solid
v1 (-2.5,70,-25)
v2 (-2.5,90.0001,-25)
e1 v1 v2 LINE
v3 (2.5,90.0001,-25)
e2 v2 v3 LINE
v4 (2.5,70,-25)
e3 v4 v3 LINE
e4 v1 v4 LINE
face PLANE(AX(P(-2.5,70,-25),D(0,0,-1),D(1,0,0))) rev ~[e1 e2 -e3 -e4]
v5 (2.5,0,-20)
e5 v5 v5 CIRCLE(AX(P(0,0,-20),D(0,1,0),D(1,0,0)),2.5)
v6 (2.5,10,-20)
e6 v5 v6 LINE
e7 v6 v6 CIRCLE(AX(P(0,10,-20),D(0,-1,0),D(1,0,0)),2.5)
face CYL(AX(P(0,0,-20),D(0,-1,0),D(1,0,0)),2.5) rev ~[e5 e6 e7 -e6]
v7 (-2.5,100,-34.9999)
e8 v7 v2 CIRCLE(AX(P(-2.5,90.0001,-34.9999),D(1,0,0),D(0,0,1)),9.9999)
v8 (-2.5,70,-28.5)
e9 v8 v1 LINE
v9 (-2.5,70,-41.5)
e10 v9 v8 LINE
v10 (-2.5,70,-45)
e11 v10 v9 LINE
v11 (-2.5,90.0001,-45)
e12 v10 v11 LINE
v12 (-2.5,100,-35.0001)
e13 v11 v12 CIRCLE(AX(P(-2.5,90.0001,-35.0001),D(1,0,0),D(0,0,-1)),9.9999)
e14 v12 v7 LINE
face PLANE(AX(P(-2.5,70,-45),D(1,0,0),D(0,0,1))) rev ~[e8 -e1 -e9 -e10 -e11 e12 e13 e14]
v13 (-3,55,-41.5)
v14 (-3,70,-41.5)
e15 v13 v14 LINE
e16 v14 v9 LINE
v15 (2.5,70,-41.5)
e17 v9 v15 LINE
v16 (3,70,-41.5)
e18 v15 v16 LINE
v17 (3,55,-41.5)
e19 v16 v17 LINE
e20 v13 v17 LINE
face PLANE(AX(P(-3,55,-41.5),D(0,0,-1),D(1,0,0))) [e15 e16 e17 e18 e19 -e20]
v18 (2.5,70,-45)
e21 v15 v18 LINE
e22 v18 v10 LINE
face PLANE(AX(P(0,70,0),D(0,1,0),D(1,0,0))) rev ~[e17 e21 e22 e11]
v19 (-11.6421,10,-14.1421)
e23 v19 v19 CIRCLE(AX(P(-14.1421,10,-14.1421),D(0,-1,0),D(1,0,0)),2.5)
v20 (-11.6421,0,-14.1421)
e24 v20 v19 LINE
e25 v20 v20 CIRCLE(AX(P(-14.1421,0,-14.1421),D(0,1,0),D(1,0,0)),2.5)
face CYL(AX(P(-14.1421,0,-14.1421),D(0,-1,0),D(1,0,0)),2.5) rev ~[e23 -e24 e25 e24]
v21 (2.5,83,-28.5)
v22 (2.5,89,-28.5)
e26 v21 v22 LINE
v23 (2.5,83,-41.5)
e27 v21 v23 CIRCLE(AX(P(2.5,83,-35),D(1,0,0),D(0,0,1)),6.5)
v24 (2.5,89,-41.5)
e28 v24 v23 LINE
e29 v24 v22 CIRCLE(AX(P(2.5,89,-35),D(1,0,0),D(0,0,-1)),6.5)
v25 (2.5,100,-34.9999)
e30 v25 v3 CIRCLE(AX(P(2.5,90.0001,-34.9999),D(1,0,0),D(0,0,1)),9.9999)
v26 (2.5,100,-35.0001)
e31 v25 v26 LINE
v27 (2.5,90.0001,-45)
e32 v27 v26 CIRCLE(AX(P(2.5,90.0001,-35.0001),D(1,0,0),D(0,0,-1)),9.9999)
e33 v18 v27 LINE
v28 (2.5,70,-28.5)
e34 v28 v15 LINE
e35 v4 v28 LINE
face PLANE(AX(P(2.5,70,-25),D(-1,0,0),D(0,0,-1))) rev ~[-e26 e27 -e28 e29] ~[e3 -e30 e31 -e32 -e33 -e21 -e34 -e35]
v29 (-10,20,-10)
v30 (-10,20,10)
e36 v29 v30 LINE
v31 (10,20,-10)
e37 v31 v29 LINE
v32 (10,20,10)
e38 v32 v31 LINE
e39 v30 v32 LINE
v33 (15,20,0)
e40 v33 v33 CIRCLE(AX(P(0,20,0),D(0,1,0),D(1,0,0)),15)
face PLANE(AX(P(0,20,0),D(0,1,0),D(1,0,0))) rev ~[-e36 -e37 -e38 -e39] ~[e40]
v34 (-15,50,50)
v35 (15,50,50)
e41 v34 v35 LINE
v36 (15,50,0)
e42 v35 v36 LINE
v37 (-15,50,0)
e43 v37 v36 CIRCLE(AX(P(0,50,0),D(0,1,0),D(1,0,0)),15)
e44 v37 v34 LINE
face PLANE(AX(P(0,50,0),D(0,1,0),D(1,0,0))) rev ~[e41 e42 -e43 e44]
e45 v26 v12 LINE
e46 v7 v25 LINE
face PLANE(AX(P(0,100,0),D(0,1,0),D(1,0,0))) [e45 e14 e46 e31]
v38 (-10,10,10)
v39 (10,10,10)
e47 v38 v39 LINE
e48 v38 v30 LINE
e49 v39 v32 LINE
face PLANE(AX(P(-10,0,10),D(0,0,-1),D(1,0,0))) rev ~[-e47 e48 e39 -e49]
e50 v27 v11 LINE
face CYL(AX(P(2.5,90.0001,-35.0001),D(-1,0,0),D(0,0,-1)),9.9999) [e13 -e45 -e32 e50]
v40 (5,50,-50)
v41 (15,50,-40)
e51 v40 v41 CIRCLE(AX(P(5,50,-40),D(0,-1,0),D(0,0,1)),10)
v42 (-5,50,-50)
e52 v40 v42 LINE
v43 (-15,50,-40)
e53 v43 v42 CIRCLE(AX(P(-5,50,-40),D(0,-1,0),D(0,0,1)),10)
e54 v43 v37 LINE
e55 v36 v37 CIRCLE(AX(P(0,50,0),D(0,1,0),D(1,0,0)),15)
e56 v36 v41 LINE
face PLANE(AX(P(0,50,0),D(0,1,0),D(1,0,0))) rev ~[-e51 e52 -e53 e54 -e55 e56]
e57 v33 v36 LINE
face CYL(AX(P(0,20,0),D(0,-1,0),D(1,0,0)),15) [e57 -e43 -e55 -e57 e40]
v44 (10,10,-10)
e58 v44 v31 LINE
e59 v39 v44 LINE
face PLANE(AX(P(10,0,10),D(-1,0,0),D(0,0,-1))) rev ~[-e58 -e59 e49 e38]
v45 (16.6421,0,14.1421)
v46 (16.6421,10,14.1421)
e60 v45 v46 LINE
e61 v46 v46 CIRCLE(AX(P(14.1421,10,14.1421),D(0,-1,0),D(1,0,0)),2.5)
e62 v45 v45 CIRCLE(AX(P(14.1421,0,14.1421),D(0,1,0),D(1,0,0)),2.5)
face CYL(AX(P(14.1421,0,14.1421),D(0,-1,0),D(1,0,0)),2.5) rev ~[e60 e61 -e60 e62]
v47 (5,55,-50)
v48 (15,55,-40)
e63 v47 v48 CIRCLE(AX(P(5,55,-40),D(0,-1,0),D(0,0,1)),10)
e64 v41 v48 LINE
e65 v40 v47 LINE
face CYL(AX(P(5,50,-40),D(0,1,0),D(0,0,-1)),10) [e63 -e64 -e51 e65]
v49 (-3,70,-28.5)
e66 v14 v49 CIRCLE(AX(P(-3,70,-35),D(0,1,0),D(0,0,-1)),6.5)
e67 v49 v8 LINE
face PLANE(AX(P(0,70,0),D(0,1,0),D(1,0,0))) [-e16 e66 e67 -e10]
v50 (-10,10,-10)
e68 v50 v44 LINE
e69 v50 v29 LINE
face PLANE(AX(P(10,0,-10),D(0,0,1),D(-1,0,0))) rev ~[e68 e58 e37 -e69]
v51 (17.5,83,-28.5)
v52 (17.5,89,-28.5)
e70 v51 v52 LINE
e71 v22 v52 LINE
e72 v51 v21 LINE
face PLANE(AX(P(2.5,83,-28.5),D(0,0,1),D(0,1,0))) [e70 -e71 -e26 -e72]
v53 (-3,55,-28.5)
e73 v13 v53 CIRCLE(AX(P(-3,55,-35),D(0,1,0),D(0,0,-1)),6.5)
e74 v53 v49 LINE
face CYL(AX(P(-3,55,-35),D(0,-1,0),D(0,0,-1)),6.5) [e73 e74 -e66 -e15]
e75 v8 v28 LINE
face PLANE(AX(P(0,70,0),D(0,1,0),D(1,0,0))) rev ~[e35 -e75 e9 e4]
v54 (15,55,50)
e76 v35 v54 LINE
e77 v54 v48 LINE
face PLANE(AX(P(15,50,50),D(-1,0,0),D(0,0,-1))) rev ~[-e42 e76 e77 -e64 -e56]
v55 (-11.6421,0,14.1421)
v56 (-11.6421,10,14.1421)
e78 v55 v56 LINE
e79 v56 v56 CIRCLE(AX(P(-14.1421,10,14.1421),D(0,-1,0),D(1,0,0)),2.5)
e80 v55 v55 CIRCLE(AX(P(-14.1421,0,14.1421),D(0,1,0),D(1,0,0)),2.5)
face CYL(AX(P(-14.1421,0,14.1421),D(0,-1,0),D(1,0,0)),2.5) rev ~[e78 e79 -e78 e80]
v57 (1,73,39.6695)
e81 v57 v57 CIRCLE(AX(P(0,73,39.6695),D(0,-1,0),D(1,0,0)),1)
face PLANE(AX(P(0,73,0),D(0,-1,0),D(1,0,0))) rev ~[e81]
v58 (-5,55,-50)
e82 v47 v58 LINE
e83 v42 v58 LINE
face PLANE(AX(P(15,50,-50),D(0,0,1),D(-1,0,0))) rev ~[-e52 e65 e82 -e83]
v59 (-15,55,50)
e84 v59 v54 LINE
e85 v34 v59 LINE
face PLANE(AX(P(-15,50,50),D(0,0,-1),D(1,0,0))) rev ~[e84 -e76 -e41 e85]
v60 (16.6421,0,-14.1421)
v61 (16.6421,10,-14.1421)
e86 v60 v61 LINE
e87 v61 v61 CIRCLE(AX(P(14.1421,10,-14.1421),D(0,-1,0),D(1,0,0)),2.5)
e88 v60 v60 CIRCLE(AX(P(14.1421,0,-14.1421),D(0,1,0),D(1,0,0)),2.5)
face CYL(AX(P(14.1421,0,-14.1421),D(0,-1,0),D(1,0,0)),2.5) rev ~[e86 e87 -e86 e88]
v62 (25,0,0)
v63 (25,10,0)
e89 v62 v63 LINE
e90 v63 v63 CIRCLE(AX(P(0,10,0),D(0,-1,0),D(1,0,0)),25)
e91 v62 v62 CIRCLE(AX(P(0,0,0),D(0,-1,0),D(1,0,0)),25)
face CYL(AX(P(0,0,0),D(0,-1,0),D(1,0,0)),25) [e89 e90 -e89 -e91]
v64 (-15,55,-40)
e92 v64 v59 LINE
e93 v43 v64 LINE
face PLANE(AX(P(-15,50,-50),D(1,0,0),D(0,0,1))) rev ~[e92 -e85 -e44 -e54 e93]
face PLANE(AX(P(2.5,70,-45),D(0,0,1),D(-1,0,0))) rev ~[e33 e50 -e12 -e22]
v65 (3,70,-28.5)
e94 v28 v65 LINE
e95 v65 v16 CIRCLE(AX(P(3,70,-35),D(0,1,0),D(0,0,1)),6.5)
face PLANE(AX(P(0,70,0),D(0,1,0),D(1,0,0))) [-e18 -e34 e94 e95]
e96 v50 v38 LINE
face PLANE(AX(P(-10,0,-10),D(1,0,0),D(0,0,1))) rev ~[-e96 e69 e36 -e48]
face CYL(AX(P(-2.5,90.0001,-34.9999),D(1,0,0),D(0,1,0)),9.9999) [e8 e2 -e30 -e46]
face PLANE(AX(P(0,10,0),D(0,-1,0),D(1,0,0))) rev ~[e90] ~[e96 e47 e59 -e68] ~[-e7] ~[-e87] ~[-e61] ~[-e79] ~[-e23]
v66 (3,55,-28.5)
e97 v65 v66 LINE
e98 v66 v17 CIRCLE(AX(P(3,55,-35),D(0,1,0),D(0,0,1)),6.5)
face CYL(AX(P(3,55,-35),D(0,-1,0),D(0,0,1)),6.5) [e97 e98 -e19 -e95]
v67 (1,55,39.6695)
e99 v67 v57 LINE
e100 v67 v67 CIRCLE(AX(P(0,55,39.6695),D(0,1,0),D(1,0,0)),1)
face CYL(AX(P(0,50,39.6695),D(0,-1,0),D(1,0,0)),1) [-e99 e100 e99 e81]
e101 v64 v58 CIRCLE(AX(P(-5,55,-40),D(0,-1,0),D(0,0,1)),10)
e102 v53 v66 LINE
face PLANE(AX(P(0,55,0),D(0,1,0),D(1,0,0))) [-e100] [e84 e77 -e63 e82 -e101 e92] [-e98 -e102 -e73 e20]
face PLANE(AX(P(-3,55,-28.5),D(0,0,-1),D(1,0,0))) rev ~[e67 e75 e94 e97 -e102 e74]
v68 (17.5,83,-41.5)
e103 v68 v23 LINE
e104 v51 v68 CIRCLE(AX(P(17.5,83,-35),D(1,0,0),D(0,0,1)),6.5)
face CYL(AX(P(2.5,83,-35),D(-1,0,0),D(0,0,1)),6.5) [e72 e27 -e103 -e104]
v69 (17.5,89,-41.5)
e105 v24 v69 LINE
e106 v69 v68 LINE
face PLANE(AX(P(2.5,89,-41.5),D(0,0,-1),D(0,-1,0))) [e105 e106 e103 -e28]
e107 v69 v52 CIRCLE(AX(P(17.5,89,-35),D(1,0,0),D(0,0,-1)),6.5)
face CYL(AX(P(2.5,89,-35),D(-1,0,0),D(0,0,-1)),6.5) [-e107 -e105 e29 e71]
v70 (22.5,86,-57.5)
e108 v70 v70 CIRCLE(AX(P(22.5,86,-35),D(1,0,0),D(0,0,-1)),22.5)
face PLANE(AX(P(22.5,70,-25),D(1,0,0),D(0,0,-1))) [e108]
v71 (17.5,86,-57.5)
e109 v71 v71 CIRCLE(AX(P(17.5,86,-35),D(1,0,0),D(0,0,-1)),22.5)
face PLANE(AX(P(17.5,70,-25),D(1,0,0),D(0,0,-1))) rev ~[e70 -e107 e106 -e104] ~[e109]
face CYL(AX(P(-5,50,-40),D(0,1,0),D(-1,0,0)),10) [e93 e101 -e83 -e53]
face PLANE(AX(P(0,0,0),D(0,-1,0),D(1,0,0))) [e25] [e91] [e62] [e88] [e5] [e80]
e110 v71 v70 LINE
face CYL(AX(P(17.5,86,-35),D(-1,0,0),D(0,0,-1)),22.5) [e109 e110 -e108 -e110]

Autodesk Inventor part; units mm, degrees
ref_plane "YZ Plane" through (0, 0, 0) normal (1, 0, 0) x (0, 1, 0)
ref_plane "XZ Plane" through (0, 0, 0) normal (0, 1, 0) x (-1, 0, 0)
ref_plane "XY Plane" through (0, 0, 0) normal (0, 0, 1) x (1, 0, 0)
sketch "Sketch1" plane through (0, 0, 0) normal (0, 1, 0) x (-1, 0, 0)
  line L0 (10, 10) -> (-10, 10)
  line L1 (-10, 10) -> (-10, -10)
  line L2 (-10, -10) -> (10, -10)
  line L3 (10, -10) -> (10, 10)
  line L4 (10, 10) -> (-10, -10) construction
  line L5 (-10, 10) -> (10, -10) construction
  point P0 (0, 0)
  dimension "d0" = 20
  dimension "d1" = 20
extrude "Extrusion1" add sketch "Sketch1" along normal blind 20
sketch "Sketch2" plane through (0, 20, 0) normal (0, 1, 0) x (1, 0, 0)
  circle A0 centre (0, 0) radius 15
  dimension "d4" = 30
extrude "Extrusion2" add sketch "Sketch2" along normal blind 30
sketch "Sketch3" plane through (0, 50, 0) normal (0, 1, 0) x (1, 0, 0)
  line L0 (-15, -50) -> (15, -50)
  line L1 (15, -50) -> (15, 50)
  line L2 (15, 50) -> (-15, 50)
  line L3 (-15, 50) -> (-15, -50)
  line L4 (-15, -50) -> (15, 50) construction
  line L5 (15, -50) -> (-15, 50) construction
  point P0 (0, 0)
  dimension "d7" = 30
  dimension "d8" = 100
extrude "Extrusion3" add sketch "Sketch3" along normal blind 5
sketch "Sketch4" plane through (0, 55, 0) normal (0, 1, 0) x (1, 0, 0)
  arc A0 (-3, 41.5) -> (-3, 28.5) centre (-3, 35) ccw
  arc A1 (3, 28.5) -> (3, 41.5) centre (3, 35) ccw
  line L0 (-3, 28.5) -> (3, 28.5)
  line L1 (-3, 41.5) -> (3, 41.5)
  point P0 (0, 0)
  dimension "d11" = 13
  dimension "d12" = 13
  dimension "d13" = 3
  dimension "d14" = 3
  dimension "d15" = 35
extrude "Extrusion4" cut sketch "Sketch4" against normal blind 5
fillet "Fillet1" radius 10 2 edges at (-15, 52.5, -50) (15, 52.5, -50)
sketch "Sketch5" plane through (0, 55, 0) normal (0, 1, 0) x (1, 0, 0)
  circle A0 centre (0, -39.6695) radius 1
  point P0 (0, 0)
  dimension "d19" = 2
extrude "Extrusion5" cut sketch "Sketch5" against normal blind 5
sketch "Sketch6" plane through (0, 0, 0) normal (0, -1, 0) x (1, 0, 0)
  circle A0 centre (-14.1421, 14.1421) radius 2.5
  circle A1 centre (-14.1421, -14.1421) radius 2.5
  line L0 (0, 0) -> (-14.1421, 14.1421)
  line L1 (0, 0) -> (0, -20)
  line L2 (0, 0) -> (-14.1421, -14.1421)
  circle A2 centre (0, -20) radius 2.5
  circle A3 centre (0, 0) radius 25
  line L3 (0, 0) -> (14.1421, 14.1421)
  circle A4 centre (14.1421, 14.1421) radius 2.5
  line L4 (0, 0) -> (14.1421, -14.1421)
  circle A5 centre (14.1421, -14.1421) radius 2.5
  line L5 (-10, 10) -> (10, 10)
  line L6 (10, 10) -> (10, -10)
  line L7 (10, -10) -> (-10, -10)
  line L8 (-10, -10) -> (-10, 10)
  line L9 (-10, 10) -> (10, -10) construction
  line L10 (10, 10) -> (-10, -10) construction
  dimension "d22" = 20
  dimension "d23" = 20
  dimension "d24" = 135
  dimension "d25" = 5
  dimension "d26" = 5
  dimension "d27" = 20
  dimension "d28" = 90
  dimension "d29" = 5
  dimension "d30" = 20
  dimension "d31" = 90
  dimension "d32" = 5
  dimension "d33" = 20
  dimension "d34" = 90
  dimension "d35" = 5
  dimension "d36" = 20
  dimension "d37" = 20
extrude "Extrusion6" add sketch "Sketch6" against normal blind 10
sketch "Sketch7" plane through (0, 55, 0) normal (0, 1, 0) x (1, 0, 0)
  arc A0 (-3, 41.5) -> (-3, 28.5) centre (-3, 35) ccw
  arc A1 (3, 28.5) -> (3, 41.5) centre (3, 35) ccw
  line L0 (-3, 28.5) -> (3, 28.5)
  line L1 (-3, 41.5) -> (3, 41.5)
  point P0 (0, 0)
  dimension "d40" = 13
  dimension "d41" = 13
extrude "Extrusion7" add sketch "Sketch7" along normal blind 15 and the other way blind 5
sketch "Sketch8" plane through (0, 70, 0) normal (0, 1, 0) x (1, 0, 0)
  line L0 (-2.5, 25) -> (2.5, 25)
  line L1 (2.5, 25) -> (2.5, 45)
  line L2 (2.5, 45) -> (-2.5, 45)
  line L3 (-2.5, 45) -> (-2.5, 25)
  line L4 (-2.5, 25) -> (2.5, 45) construction
  line L5 (2.5, 25) -> (-2.5, 45) construction
  arc A0 (-2.8422, 41.5) -> (-2.8422, 28.5) centre (-2.8422, 35) ccw construction
  arc A1 (3.1578, 28.5) -> (3.1578, 41.5) centre (3.1578, 35) ccw construction
  line L6 (-2.8422, 28.5) -> (3.1578, 28.5) construction
  line L7 (-2.8422, 41.5) -> (3.1578, 41.5) construction
  point P0 (0, 0)
  point P1 (0, 35)
  point P2 (0, 35)
  point P3 (0, 35)
  dimension "d46" = 5
  dimension "d47" = 20
  dimension "d48" = 13
  dimension "d49" = 13
  dimension "d50" = 35
  dimension "d51" = 0
  dimension "d52" = 0
extrude "Extrusion8" add sketch "Sketch8" along normal blind 30
sketch "Sketch9" plane through (2.5, 70, -25) normal (1, 0, 0) x (0, 0, -1)
  line L0 (0, 0) -> (0, 30) construction
  line L1 (16.5, 0) -> (20, 0) projected
  line L2 (0, 30) -> (20, 30) construction
  line L3 (20, 30) -> (20, 0) construction
  line L4 (20, 0) -> (0, 0) construction
  line L5 (0, 0) -> (0, 30) construction
  arc A0 (16.5, 19) -> (3.5, 19) centre (10, 19) ccw
  arc A1 (3.5, 13) -> (16.5, 13) centre (10, 13) ccw
  line L6 (3.5, 13) -> (3.5, 19)
  line L7 (16.5, 19) -> (16.5, 13)
  point P0 (-25, -70)
  point P1 (18.25, 0)
  dimension "d55" = 13
  dimension "d56" = 13
  dimension "d57" = 6
  dimension "d58" = 13
extrude "Extrusion9" cut sketch "Sketch9" against normal blind 30
fillet "Fillet2" radius 10 2 edges at (0, 100, -45) (0, 100, -25)
sketch "Sketch10" plane through (0, 50, 0) normal (0, -1, 0) x (1, 0, 0)
  circle A0 centre (0, 39.6695) radius 1 projected
  line L0 (0, 0) -> (0, 39.6695) construction
  circle A1 centre (0, 39.6695) radius 1
extrude "Extrusion10" add sketch "Sketch10" against normal blind 23
sketch "Sketch11" plane through (2.5, 70, -25) normal (1, 0, 0) x (0, 0, -1)
  arc A0 (16.5, 19) -> (3.5, 19) centre (10, 19) ccw
  arc A1 (3.5, 13) -> (16.5, 13) centre (10, 13) ccw
  line L0 (3.5, 13) -> (3.5, 19)
  line L1 (16.5, 19) -> (16.5, 13)
  point P0 (-25, -70)
  dimension "d65" = 13
  dimension "d66" = 13
  dimension "d67" = 6
extrude "Extrusion11" add sketch "Sketch11" along normal blind 15 and the other way blind 5
sketch "Sketch13" plane through (17.5, 70, -25) normal (1, 0, 0) x (0, 0, -1)
  line L0 (3.5, 13) -> (3.5, 19) construction
  arc A0 (3.5, 13) -> (16.5, 13) centre (10, 13) ccw projected
  line L1 (3.5, 19) -> (16.5, 19) construction
  line L2 (16.5, 19) -> (16.5, 13) construction
  line L3 (16.5, 13) -> (3.5, 13) construction
  line L4 (3.5, 13) -> (3.5, 19) construction
  circle A1 centre (10, 16) radius 22.5
  point P0 (-25, -70)
  dimension "d76" = 45
extrude "Extrusion13" add sketch "Sketch13" along normal blind 5
properties part number "herramienta5"
